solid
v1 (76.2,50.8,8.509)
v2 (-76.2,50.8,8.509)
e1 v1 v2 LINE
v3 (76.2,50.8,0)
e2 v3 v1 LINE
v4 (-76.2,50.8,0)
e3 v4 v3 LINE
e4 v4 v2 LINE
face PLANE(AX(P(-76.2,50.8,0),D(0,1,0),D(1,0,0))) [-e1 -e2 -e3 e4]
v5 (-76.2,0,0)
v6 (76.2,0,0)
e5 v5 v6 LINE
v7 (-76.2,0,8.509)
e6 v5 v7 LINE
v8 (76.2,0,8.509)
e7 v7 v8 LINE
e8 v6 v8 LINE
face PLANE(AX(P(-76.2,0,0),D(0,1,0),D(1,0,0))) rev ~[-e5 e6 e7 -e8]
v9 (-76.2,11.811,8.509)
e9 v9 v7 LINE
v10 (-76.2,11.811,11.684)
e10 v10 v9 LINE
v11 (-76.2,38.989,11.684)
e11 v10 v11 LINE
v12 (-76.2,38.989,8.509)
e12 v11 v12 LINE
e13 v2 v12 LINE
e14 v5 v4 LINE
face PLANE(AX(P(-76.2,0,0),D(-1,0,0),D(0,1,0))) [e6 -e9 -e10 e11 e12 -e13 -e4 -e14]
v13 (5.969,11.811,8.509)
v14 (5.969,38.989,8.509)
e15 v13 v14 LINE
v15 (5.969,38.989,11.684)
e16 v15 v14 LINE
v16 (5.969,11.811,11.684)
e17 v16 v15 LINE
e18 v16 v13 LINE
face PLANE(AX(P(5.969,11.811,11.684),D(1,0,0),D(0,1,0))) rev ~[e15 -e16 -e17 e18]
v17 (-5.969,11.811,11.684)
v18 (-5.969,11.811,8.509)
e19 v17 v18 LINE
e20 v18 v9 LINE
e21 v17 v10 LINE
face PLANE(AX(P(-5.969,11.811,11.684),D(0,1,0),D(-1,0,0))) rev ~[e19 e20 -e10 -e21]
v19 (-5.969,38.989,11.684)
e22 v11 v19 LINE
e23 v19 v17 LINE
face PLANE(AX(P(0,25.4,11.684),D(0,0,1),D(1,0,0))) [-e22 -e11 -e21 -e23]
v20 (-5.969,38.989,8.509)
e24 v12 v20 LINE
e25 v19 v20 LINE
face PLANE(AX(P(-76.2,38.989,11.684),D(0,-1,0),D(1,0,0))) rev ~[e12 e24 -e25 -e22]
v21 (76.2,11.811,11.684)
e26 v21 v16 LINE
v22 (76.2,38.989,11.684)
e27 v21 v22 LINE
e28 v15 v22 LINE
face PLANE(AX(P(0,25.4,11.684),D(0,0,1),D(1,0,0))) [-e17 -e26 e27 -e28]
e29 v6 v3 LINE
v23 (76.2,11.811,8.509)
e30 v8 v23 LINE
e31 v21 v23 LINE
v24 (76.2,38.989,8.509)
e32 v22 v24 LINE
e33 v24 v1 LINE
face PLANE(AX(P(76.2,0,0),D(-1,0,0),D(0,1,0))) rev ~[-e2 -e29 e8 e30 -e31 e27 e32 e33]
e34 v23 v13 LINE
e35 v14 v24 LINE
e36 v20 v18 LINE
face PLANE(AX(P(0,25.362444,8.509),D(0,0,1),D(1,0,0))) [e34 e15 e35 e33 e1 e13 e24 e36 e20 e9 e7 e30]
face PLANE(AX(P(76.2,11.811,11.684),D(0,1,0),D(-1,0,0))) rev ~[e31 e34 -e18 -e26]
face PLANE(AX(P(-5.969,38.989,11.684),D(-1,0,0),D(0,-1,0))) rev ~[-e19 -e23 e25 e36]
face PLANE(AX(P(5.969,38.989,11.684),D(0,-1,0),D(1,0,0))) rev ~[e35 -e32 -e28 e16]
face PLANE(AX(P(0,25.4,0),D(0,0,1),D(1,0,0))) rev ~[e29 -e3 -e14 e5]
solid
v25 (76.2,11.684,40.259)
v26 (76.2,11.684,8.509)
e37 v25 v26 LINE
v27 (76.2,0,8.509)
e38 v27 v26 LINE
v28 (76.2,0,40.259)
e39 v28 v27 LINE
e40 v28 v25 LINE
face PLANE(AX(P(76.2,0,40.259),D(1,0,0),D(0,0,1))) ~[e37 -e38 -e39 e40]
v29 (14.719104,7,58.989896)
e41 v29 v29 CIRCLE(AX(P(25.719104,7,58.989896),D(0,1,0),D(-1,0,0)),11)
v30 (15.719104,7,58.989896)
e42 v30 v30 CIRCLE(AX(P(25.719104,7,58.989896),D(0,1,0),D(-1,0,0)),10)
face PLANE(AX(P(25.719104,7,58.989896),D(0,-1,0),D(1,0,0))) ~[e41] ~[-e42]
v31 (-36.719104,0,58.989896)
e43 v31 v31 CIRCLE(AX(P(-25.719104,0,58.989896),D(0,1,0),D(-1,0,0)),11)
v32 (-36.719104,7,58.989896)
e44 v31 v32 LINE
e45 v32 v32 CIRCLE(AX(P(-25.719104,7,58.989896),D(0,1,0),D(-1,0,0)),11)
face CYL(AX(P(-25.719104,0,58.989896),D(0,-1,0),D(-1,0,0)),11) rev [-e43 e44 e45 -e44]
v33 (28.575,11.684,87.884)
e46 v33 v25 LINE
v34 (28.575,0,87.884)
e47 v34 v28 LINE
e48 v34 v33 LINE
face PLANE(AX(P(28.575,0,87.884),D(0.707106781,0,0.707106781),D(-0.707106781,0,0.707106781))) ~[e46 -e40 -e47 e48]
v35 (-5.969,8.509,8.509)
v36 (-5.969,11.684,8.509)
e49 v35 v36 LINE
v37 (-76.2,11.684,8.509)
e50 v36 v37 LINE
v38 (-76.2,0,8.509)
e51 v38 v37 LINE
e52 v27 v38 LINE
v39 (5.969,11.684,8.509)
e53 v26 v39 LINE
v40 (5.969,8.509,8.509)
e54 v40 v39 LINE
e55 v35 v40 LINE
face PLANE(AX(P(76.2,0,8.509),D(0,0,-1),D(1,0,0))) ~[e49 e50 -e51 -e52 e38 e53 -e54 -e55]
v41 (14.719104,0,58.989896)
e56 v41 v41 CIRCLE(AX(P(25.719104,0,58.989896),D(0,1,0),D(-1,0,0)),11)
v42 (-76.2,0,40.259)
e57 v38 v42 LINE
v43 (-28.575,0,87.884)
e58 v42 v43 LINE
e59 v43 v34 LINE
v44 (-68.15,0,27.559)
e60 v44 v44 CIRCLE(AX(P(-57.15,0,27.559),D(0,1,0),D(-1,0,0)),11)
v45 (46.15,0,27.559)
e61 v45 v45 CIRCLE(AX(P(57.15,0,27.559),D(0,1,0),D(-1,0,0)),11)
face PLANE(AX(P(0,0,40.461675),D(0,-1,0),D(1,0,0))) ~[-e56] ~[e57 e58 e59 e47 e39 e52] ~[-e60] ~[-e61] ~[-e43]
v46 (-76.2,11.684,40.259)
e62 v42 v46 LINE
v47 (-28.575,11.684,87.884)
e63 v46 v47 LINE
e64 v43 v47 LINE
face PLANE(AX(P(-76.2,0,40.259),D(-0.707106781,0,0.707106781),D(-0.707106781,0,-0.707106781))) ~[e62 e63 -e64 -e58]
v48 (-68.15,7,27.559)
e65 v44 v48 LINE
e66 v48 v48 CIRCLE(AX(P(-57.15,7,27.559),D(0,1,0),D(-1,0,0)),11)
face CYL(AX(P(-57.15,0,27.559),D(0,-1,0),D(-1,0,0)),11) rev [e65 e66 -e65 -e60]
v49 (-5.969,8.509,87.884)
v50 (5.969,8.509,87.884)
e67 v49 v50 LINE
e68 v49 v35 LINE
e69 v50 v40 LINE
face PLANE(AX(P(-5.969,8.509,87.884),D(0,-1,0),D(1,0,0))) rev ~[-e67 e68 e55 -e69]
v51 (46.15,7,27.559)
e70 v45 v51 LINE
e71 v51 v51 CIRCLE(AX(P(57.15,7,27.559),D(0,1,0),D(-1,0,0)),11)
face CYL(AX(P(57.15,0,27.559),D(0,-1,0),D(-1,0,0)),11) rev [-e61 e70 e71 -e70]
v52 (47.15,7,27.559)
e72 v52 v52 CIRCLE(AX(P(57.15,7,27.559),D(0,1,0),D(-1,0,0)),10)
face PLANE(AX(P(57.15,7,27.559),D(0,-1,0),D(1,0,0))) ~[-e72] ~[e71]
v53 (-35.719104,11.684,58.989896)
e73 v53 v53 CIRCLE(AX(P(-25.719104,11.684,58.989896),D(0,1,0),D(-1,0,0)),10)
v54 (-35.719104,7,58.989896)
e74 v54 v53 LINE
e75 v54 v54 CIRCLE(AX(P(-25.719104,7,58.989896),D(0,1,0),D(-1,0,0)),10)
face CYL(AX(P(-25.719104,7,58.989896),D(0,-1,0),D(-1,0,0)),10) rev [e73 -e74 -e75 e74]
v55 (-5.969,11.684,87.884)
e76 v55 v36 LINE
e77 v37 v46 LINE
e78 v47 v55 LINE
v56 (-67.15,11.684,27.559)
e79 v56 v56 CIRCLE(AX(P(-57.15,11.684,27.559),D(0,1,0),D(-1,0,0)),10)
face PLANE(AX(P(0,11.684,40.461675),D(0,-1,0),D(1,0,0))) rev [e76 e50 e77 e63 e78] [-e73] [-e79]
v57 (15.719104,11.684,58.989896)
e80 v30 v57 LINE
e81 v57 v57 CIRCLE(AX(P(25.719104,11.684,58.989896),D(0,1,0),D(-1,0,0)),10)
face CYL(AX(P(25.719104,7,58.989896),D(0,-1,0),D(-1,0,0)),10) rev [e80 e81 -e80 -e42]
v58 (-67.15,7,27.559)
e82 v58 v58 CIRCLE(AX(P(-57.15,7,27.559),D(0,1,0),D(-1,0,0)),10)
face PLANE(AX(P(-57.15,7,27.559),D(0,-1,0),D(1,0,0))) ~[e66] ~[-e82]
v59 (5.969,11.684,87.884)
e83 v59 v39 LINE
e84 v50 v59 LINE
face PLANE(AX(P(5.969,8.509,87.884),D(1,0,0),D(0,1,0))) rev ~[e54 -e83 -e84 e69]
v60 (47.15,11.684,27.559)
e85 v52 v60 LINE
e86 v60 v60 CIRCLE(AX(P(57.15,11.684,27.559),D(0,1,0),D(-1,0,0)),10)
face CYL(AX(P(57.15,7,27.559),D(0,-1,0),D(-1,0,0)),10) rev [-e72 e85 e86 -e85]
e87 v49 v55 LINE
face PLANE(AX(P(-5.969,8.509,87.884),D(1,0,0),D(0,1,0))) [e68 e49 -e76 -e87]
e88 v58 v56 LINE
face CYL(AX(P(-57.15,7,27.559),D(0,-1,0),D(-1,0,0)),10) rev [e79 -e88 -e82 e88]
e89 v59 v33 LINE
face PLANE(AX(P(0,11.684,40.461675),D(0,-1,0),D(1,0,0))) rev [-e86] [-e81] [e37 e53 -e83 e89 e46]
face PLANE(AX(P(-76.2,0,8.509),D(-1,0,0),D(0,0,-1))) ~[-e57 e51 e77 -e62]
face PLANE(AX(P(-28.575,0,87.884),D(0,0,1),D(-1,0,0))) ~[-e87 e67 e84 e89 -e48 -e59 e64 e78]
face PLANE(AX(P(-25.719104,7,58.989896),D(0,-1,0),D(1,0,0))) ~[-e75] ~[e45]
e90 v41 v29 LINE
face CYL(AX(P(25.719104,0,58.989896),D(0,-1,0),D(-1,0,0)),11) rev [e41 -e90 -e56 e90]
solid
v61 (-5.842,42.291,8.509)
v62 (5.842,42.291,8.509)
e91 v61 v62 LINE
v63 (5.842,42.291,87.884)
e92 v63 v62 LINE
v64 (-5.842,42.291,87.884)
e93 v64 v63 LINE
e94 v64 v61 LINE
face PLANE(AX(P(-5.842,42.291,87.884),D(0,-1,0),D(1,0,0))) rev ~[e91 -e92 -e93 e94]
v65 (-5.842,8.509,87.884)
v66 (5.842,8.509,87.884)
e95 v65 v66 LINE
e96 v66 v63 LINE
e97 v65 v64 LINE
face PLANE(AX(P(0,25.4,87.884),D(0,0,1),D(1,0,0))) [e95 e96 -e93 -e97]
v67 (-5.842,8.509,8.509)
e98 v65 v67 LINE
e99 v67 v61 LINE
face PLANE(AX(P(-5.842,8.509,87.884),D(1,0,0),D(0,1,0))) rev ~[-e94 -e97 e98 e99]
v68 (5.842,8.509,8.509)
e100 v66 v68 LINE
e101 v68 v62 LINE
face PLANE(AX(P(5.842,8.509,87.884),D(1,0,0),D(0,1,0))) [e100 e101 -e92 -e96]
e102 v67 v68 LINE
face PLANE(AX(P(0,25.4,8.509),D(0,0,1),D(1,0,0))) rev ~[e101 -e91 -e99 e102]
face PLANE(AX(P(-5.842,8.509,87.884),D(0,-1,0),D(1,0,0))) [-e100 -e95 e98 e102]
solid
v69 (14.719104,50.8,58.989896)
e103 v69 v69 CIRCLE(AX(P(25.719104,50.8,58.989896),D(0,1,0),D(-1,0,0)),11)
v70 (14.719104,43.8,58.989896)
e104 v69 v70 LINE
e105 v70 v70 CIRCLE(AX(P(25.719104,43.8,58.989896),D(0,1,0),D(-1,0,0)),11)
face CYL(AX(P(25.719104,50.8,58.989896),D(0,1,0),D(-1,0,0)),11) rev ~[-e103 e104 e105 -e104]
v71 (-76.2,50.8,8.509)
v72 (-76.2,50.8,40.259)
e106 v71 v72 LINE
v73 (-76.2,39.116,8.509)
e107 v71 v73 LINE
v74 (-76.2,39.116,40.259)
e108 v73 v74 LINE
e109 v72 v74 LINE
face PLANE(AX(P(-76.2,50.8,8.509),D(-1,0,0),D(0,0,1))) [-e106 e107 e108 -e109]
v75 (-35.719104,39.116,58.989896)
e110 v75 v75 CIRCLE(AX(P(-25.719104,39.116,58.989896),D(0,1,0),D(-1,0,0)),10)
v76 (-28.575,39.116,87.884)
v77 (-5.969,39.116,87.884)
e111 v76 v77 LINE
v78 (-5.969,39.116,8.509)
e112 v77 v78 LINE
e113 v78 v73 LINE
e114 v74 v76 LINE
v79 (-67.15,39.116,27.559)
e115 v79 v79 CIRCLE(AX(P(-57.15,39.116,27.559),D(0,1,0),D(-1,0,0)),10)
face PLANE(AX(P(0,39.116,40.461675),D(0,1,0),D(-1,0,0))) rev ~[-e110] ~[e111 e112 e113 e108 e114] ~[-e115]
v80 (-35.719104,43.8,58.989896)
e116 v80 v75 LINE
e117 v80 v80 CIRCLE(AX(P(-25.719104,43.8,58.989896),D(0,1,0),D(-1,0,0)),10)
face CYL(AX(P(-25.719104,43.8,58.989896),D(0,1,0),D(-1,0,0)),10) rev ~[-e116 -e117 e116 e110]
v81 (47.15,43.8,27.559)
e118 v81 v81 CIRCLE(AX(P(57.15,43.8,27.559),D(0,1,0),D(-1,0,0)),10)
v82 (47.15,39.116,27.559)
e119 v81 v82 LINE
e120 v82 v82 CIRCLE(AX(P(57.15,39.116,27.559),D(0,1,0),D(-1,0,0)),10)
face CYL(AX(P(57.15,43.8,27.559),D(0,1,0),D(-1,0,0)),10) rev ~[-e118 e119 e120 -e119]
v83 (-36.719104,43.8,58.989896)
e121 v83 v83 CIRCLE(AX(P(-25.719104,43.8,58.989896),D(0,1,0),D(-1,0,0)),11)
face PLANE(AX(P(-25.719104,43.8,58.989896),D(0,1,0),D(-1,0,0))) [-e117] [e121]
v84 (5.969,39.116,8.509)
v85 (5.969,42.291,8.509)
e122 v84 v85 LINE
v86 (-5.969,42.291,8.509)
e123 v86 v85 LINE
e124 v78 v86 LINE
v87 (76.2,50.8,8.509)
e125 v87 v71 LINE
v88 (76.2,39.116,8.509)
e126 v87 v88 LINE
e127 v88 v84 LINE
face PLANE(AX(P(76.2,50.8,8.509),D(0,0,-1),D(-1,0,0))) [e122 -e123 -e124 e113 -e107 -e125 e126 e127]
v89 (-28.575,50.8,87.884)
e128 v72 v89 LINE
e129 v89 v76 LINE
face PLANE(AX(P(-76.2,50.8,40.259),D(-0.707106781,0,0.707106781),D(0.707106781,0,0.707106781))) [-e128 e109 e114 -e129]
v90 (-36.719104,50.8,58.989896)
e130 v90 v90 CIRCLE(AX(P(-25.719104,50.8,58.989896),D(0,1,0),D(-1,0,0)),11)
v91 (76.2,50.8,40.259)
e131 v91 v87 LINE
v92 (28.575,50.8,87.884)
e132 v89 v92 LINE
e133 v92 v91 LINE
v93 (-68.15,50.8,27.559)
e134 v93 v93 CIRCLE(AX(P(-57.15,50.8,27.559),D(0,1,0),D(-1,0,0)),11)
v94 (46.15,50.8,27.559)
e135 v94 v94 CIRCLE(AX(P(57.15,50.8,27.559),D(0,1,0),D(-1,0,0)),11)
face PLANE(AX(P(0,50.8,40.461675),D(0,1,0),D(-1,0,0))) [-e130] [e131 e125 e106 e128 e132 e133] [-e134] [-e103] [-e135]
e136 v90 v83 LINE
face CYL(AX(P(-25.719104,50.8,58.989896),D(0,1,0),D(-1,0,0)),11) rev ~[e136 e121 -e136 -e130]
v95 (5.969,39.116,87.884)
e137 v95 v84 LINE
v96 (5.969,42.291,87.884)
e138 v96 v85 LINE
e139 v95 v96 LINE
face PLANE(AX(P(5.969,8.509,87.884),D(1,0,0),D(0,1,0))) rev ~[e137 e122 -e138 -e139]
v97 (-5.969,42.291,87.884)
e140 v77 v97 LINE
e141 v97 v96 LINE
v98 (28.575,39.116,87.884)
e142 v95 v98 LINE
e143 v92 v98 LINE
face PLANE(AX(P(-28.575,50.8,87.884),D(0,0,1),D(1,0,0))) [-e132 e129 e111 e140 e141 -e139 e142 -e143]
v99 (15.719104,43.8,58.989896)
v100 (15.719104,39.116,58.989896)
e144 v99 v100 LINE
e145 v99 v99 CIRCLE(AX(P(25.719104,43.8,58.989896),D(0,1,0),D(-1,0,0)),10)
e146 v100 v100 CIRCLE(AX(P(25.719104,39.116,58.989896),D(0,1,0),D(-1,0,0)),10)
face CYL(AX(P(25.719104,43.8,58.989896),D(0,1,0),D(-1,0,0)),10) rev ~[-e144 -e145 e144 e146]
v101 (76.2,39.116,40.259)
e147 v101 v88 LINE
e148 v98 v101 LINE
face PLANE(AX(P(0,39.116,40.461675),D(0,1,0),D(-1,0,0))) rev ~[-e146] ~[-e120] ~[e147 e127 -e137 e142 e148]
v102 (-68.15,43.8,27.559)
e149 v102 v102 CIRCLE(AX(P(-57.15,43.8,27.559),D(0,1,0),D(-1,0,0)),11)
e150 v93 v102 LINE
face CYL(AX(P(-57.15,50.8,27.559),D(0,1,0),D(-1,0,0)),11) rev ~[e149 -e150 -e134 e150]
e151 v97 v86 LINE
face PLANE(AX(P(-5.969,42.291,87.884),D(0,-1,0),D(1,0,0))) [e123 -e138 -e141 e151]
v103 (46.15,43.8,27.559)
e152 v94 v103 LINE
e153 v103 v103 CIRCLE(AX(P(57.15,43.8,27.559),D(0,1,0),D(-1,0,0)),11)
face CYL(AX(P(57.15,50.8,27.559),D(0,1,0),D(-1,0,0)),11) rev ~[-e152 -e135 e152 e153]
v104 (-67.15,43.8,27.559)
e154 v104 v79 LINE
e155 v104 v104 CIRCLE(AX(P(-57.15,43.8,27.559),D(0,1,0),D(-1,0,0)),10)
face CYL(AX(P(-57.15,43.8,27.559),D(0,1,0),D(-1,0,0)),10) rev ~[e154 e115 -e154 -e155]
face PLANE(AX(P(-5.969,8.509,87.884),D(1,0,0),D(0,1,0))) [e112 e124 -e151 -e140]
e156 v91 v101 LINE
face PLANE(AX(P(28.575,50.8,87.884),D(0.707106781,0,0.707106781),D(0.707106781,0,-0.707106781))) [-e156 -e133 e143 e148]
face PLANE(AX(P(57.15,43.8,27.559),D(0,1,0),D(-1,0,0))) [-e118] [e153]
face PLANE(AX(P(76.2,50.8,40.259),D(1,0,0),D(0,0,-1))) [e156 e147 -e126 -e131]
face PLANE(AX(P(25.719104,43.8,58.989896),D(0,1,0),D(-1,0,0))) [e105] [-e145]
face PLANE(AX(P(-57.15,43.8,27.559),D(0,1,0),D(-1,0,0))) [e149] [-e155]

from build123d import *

# Parameters (mm, degrees)
F0_W      = 152.4
F0_H      = 50.8
F1_DEPTH  = 11.684
F3_DEPTH  = 11.684
F4_R      = 11
F5_DEPTH  = 7
F6_R      = 10
F7_DEPTH  = 4.684
F13_W     = 11.684
F13_H     = 33.782
F14_DEPTH = 79.375
F16_DEPTH = 3.175
F17_W     = 11.938
F17_H     = 33.782
F18_DEPTH = 79.375


with BuildPart() as f1:
    # F0 (on Top) → F1 (new body)
    with BuildSketch(Plane.XY):
        with Locations((0, 25.4)):
            Rectangle(F0_W, F0_H)
    extrude(amount=F1_DEPTH)

    # F15 (on face) → F16 (cut, through all)
    with BuildSketch(Plane.XY.offset(11.684)):
        Polygon((76.2, 50.8), (-76.2, 50.8), (-76.2, 38.989), (-5.969, 38.989), (-5.969, 11.811), (-76.2, 11.811), (-76.2, -0.127), (76.2, -0.127), (76.2, 11.811), (5.969, 11.811), (5.969, 38.989), (76.2, 38.989), align=None)
    extrude(amount=-F16_DEPTH, mode=Mode.SUBTRACT)


with BuildPart() as f3:
    # F2 (on face) → F3 (new body)
    with BuildSketch(Plane(origin=(0, 50.8, 0), x_dir=(-1, 0, 0), z_dir=(0, 1, 0))):
        Polygon((-76.2, 40.259), (-76.2, 8.509), (76.2, 8.509), (76.2, 40.259), (28.575, 87.884), (-28.575, 87.884), align=None)
    extrude(amount=-F3_DEPTH)

    # F4 (on face) → F5 (cut)
    with BuildSketch(Plane(origin=(0, 50.8, 0), x_dir=(-1, 0, 0), z_dir=(0, 1, 0))):
        with Locations((-57.15, 27.559)):
            Circle(F4_R)
        with Locations((-25.7191035763, 58.9898964237)):
            Circle(F4_R)
        with Locations((25.7191035763, 58.9898964237)):
            Circle(F4_R)
        with Locations((57.15, 27.559)):
            Circle(F4_R)
    extrude(amount=-F5_DEPTH, mode=Mode.SUBTRACT)

    # F6 (on face) → F7 (cut, through all)
    with BuildSketch(Plane(origin=(0, 43.8, 0), x_dir=(-1, 0, 0), z_dir=(0, 1, 0))):
        with Locations((-25.7191035763, 58.9898964237)):
            Circle(F6_R)
        with Locations((-57.15, 27.559)):
            Circle(F6_R)
        with Locations((25.7191035763, 58.9898964237)):
            Circle(F6_R)
        with Locations((57.15, 27.559)):
            Circle(F6_R)
    extrude(amount=-F7_DEPTH, mode=Mode.SUBTRACT)


with BuildPart() as f12_1:
    # F12: instance of F3
    add(f3.part.mirror(Plane(origin=(-76.2, 25.4, 11.684), x_dir=(0, 0, -1), z_dir=(0, 1, 0))))


with BuildPart() as f14:
    # F13 (on face) → F14 (new body, through all)
    with BuildSketch(Plane.XY.offset(87.884)):
        with Locations((0, 25.4)):
            Rectangle(F13_W, F13_H)
    extrude(amount=-F14_DEPTH)


with BuildPart() as f18_tool:
    # F17 (on face) → F18 (new body, through all)
    with BuildSketch(Plane.XY.offset(87.884)):
        with Locations((0, 25.4)):
            Rectangle(F17_W, F17_H)
    extrude(amount=-F18_DEPTH)


with BuildPart() as f3_1:
    add(f3.part)

    # F18: cut by f18_tool
    add(f18_tool.part, mode=Mode.SUBTRACT)


with BuildPart() as f12_1_1:
    add(f12_1.part)

    # F18: cut by f18_tool
    add(f18_tool.part, mode=Mode.SUBTRACT)


solid = Compound([f1.part, f14.part, f3_1.part, f12_1_1.part])
